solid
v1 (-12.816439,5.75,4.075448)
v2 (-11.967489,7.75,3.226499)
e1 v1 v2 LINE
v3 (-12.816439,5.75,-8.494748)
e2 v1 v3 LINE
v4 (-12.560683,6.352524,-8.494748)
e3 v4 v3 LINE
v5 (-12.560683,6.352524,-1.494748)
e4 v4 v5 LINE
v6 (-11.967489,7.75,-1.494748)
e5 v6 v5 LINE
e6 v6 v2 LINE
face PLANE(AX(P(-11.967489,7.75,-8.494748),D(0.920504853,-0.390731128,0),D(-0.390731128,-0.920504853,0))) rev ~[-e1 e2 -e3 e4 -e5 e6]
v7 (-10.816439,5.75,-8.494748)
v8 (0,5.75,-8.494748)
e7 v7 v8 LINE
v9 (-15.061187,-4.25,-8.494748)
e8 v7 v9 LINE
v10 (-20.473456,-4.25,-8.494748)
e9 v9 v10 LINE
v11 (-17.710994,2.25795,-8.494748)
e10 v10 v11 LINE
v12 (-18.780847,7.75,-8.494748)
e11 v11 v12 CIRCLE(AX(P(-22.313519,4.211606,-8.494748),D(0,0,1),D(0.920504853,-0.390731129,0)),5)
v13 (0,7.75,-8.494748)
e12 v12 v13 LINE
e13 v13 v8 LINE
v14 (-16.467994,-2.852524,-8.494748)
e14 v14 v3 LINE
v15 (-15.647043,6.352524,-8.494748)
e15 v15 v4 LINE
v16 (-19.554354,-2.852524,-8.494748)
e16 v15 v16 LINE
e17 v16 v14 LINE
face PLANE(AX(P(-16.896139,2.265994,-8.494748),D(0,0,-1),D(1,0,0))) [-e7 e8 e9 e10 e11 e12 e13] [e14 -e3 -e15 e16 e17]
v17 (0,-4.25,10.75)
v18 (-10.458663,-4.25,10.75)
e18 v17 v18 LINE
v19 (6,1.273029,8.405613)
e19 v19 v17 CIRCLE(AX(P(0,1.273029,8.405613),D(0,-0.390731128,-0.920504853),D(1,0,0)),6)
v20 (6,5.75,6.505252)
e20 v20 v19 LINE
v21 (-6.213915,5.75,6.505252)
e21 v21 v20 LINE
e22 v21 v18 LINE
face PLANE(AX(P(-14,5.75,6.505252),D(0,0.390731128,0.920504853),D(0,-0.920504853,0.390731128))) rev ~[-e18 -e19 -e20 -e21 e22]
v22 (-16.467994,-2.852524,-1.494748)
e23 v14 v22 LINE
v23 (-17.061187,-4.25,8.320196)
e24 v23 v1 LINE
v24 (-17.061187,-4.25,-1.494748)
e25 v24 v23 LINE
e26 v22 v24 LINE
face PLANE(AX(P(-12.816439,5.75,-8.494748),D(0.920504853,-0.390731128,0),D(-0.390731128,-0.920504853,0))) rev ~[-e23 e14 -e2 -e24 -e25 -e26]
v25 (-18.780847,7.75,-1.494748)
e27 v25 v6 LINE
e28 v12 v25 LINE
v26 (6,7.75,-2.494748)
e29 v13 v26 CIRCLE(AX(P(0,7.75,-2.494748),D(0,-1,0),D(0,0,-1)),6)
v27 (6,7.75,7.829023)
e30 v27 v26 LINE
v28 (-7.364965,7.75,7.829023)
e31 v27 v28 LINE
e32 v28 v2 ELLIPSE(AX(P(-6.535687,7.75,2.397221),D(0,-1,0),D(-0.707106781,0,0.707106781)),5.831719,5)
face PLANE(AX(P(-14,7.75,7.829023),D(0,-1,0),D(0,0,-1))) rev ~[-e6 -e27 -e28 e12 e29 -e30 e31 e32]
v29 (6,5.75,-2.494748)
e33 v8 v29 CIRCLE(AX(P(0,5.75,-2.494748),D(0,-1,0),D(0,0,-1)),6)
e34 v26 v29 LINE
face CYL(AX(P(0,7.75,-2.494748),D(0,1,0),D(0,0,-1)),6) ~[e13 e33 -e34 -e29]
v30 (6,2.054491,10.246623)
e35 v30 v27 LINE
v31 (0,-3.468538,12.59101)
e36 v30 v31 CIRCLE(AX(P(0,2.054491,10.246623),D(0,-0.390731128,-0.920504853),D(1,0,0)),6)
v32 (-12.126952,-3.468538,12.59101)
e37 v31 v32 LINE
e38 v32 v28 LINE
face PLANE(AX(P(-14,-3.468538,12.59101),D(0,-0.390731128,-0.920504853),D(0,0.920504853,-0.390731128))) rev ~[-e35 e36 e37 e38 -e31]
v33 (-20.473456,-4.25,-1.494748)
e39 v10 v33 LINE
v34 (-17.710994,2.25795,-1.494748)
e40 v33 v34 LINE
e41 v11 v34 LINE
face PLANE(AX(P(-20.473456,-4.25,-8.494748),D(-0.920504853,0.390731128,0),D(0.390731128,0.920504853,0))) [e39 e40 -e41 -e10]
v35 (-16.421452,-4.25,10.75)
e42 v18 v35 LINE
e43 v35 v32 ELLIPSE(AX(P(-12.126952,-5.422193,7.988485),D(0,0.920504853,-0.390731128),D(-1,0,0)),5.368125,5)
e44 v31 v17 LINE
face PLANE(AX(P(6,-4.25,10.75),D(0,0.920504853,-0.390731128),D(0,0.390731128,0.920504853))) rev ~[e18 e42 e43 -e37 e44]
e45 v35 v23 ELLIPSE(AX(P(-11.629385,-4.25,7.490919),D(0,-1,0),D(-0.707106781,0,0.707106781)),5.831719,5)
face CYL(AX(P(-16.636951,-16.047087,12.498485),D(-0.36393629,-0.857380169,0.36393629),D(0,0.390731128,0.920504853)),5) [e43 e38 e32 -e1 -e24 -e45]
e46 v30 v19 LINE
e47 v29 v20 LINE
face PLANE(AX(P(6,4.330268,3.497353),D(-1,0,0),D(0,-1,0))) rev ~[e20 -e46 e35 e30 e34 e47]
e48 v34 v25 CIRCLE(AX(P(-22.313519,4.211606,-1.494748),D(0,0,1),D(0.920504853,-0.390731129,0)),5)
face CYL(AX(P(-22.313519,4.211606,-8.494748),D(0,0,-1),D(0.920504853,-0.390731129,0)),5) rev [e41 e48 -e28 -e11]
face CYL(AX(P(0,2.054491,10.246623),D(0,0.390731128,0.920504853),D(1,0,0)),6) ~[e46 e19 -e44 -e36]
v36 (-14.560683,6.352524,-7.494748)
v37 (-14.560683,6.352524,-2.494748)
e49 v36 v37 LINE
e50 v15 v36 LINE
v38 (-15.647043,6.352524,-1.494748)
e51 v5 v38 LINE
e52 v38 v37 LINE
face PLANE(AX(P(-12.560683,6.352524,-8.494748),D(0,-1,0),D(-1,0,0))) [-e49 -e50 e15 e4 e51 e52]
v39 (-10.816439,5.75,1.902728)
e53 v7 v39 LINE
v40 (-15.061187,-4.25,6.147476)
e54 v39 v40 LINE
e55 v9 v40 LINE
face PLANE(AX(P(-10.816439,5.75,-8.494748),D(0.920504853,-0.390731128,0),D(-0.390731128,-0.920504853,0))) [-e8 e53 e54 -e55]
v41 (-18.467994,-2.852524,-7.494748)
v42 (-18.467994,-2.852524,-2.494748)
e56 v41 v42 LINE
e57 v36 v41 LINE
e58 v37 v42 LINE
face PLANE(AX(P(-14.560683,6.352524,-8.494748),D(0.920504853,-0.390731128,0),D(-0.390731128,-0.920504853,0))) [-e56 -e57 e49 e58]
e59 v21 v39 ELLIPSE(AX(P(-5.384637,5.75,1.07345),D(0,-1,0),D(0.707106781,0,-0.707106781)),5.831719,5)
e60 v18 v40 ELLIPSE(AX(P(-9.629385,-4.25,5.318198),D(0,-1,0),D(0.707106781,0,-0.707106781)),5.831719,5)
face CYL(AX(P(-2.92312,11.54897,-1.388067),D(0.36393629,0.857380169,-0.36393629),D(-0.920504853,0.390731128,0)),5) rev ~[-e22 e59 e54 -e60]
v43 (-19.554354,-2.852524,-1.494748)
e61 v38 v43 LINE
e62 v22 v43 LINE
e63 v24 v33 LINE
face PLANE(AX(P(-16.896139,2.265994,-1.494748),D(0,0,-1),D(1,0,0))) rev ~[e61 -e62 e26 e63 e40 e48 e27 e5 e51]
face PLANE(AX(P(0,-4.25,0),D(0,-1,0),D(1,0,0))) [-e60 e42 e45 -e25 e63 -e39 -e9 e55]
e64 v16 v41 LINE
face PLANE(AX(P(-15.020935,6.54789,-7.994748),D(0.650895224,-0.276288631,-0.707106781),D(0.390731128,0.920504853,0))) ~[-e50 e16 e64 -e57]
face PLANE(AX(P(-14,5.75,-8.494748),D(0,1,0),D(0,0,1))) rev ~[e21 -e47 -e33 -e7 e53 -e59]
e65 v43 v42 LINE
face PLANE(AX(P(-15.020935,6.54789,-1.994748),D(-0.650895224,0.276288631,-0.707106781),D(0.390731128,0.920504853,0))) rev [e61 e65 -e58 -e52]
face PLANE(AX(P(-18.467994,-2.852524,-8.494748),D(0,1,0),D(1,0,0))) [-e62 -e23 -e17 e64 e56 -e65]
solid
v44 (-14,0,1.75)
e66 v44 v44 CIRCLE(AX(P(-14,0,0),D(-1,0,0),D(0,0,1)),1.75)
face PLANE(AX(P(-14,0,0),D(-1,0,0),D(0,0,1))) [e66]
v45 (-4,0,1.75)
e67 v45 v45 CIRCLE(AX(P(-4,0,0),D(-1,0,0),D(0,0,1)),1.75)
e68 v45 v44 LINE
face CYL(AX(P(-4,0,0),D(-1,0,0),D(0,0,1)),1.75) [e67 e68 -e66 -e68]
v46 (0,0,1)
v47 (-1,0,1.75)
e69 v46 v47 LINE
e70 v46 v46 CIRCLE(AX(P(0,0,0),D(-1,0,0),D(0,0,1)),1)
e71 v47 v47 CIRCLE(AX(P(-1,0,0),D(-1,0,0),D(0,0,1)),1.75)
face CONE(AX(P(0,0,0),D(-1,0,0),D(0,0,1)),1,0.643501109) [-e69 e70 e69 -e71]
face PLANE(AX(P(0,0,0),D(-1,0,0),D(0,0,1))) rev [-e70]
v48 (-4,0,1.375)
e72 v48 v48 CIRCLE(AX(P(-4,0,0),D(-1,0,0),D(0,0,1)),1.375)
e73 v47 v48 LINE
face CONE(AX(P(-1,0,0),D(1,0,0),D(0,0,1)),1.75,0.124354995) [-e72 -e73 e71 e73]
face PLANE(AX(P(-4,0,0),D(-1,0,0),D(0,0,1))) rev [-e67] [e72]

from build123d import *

# Parameters (mm, degrees)
F4_DEPTH      = 20
F4_DEPTH_BACK = 5
F6_DEPTH      = 2
F8_DEPTH      = 2
F10_DEPTH     = 25
F11_REACH     = 32.8764516567
F14_REACH     = 25.371169227
F16_DEPTH     = 7
F17_SIZE      = 1
F18_T4_DEPTH  = 33.0979417074
F18_T8_DEPTH  = 34.519175586


# Not quite as in the source:
# - a fillet or chamfer that OpenCascade refuses, or shapes differently, is made with other operations: its cross-section is extruded or revolved along the edge and cut away or added
# - a feature names something its author has since deleted; it is built from what else it names


with BuildPart() as f1:
    # F0 (on Front) → F1 (revolve)
    with BuildSketch(Plane.XZ):
        Polygon((-4, 1.75), (-14, 1.75), (-14, 0), (0, 0), (0, 1), (-1, 1.75), (-4, 1.375), align=None)
    revolve(axis=Axis((-7, 0, 0), (-1, 0, 0)))


with BuildPart() as f4:
    # F3 (on offset) → F4 (new body, two sides)
    with BuildSketch(Plane(origin=(-14, 0, 0), x_dir=(0, -1, 0), z_dir=(-1, 0, 0))) as f4_sk:
        Polygon((-5.75, 6.5052518379), (4.25, 10.75), (3.468537743, 12.5910097069), (-7.75, 7.8290229603), (-7.75, -8.4947481621), (-5.75, -8.4947481621), align=None)
    extrude(amount=-F4_DEPTH)
    extrude(f4_sk.sketch, amount=F4_DEPTH_BACK)

    # F5 (on face) → F6 (cut, through all)
    with BuildSketch(Plane(origin=(0, 7.75, 0), x_dir=(-1, 0, 0), z_dir=(0, 1, 0))):
        with BuildLine():
            ThreePointArc((0, -8.4947481621), (-4.2426406871, -6.7373888492), (-6, -2.4947481621))
            Line((-6, -2.4947481621), (-6, -8.4947481621))
            Line((-6, -8.4947481621), (0, -8.4947481621))
        make_face()
    extrude(amount=-F6_DEPTH, mode=Mode.SUBTRACT)

    # F7 (on face) → F8 (cut, through all)
    with BuildSketch(Plane(origin=(0, 3.999062721, 9.4212013724), x_dir=(1, 0, 0), z_dir=(0, 0.3907311285, 0.9205048535))):
        with BuildLine():
            ThreePointArc((6, -2.1125052584), (4.2426406871, -6.3551459456), (0, -8.1125052584))
            Line((0, -8.1125052584), (6, -8.1125052584))
            Line((6, -8.1125052584), (6, -2.1125052584))
        make_face()
    extrude(amount=-F8_DEPTH, mode=Mode.SUBTRACT)

    # F9 (on face) → F10 (cut)
    with BuildSketch(Plane(origin=(0, 0, -8.4947481621), x_dir=(1, 0, 0), z_dir=(0, 0, -1))):
        Polygon((-19, -5.75), (-12.8164388784, -5.75), (-17.0611870405, 4.25), (-19, 4.25), align=None)
        Polygon((-19, -7.75), (-11.967489246, -7.75), (-12.8164388784, -5.75), (-19, -5.75), align=None)
    extrude(amount=-F10_DEPTH, mode=Mode.SUBTRACT)

    f11_end = Plane(origin=(-4.5062197261, 2.0556087421, 10.2461486429), x_dir=(0, 0.9205048535, -0.3907311285), z_dir=(0, 0.3907311285, 0.9205048535))
    # F9 (on face) → F11 (join, up to a plane its end follows)
    with BuildSketch(Plane(origin=(0, 0, -8.4947481621), x_dir=(1, 0, 0), z_dir=(0, 0, -1))):
        Polygon((-11.967489246, -7.75), (-9.967489246, -7.75), (-10.8164388784, -5.75), (-12.8164388784, -5.75), align=None)
        Polygon((-12.8164388784, -5.75), (-10.8164388784, -5.75), (-15.0611870405, 4.25), (-17.0611870405, 4.25), align=None)
    f11_long = extrude(amount=-F11_REACH, mode=Mode.PRIVATE)
    add(split(f11_long, bisect_by=f11_end, keep=Keep.BOTTOM, mode=Mode.PRIVATE))

    f14_end = f4.faces().sort_by_distance((-14.6289155357, 1.480072579, 0.9978505439))[0]
    # F13 (on face) → F14 (cut, up to a face of the model that its end follows)
    with BuildSketch(Plane.YZ.offset(6)):
        Polygon((-4.25, 10.75), (-3.468537743, 12.5910097069), (-4.25, 12.9227207548), align=None)
    f14_long = extrude(amount=-F14_REACH, mode=Mode.PRIVATE)
    add(split(f14_long, bisect_by=f14_end, keep=Keep.BOTTOM, mode=Mode.PRIVATE), mode=Mode.SUBTRACT)

    # F15 (on face) → F16 (join)
    with BuildSketch(Plane(origin=(0, 0, -8.4947481621), x_dir=(1, 0, 0), z_dir=(0, 0, -1))):
        with BuildLine():
            Line((-15.3797577366, -7.75), (-11.967489246, -7.75))
            Line((-11.967489246, -7.75), (-12.5606825008, -6.3525242673))
            Line((-12.5606825008, -6.3525242673), (-14.5606825008, -6.3525242673))
            Line((-14.5606825008, -6.3525242673), (-18.4679937857, 2.8525242673))
            Line((-18.4679937857, 2.8525242673), (-16.4679937857, 2.8525242673))
            Line((-16.4679937857, 2.8525242673), (-17.0611870405, 4.25))
            Line((-17.0611870405, 4.25), (-20.4734555312, 4.25))
            Line((-20.4734555312, 4.25), (-17.7109944528, -2.257950467))
            ThreePointArc((-17.7109944528, -2.257950467), (-17.4057692366, -5.1676369709), (-18.7808471141, -7.75))
            Line((-18.7808471141, -7.75), (-15.3797577366, -7.75))
        make_face()
    extrude(amount=-F16_DEPTH)

    # F17
    f17_edges = [f4.edges().sort_by_distance(p)[0] for p in [
        (-16.514338, 1.75, -1.494748),
        (-16.514338, 1.75, -8.494748),
    ]]
    chamfer(f17_edges, length=F17_SIZE)

    # F18: fillet of radius 5 on 2 edges, made by hand


with BuildPart() as f18_tool2:
    # F18_s3 → F18_t4 (new body)
    with BuildSketch(Plane(origin=(3.4003281709, 8.010671166, -3.4003281709), x_dir=(0.9205048535, -0.3907311285, 0), z_dir=(-0.3639362896, -0.857380169, 0.3639362896))):
        with BuildLine():
            ThreePointArc((-12.2032884735, 2.1604142833), (-10.99912635, 5.4148904033), (-7.9666425473, 7.101799773))
            Line((-7.9666425473, 7.101799773), (-12.2032884735, 6.4473151282))
            Line((-12.2032884735, 6.4473151282), (-12.2032884735, 2.1604142833))
        make_face()
    extrude(amount=F18_T4_DEPTH)

    split(bisect_by=Plane.XZ.offset(-5.75), keep=Keep.TOP)

    split(bisect_by=Plane.XZ.offset(4.25), keep=Keep.BOTTOM)

    split(bisect_by=Plane(origin=(0, -7.467600464, 3.1698083345), x_dir=(1, 0, 0), z_dir=(0, 0.9205048535, -0.3907311285)), keep=Keep.TOP)


with BuildPart() as f4_1:
    add(f4.part)

    # F18_t1: union F18_tool2
    add(f18_tool2.part)

    # F18_s9 → F18_t8 (cut)
    with BuildSketch(Plane(origin=(-8.8661781717, -20.8874068216, 8.8661781717), x_dir=(-0.9205048535, 0.3907311285, 0), z_dir=(0.3639362896, 0.857380169, -0.3639362896))):
        with BuildLine():
            ThreePointArc((9.8076522542, 8.841121216), (12.8401360569, 7.1542118462), (14.0442981804, 3.8997357263))
            Line((14.0442981804, 3.8997357263), (14.0442981804, 8.1866365712))
            Line((14.0442981804, 8.1866365712), (9.8076522542, 8.841121216))
        make_face()
    extrude(amount=F18_T8_DEPTH, mode=Mode.SUBTRACT)


solid = Compound([f1.part, f4_1.part])
